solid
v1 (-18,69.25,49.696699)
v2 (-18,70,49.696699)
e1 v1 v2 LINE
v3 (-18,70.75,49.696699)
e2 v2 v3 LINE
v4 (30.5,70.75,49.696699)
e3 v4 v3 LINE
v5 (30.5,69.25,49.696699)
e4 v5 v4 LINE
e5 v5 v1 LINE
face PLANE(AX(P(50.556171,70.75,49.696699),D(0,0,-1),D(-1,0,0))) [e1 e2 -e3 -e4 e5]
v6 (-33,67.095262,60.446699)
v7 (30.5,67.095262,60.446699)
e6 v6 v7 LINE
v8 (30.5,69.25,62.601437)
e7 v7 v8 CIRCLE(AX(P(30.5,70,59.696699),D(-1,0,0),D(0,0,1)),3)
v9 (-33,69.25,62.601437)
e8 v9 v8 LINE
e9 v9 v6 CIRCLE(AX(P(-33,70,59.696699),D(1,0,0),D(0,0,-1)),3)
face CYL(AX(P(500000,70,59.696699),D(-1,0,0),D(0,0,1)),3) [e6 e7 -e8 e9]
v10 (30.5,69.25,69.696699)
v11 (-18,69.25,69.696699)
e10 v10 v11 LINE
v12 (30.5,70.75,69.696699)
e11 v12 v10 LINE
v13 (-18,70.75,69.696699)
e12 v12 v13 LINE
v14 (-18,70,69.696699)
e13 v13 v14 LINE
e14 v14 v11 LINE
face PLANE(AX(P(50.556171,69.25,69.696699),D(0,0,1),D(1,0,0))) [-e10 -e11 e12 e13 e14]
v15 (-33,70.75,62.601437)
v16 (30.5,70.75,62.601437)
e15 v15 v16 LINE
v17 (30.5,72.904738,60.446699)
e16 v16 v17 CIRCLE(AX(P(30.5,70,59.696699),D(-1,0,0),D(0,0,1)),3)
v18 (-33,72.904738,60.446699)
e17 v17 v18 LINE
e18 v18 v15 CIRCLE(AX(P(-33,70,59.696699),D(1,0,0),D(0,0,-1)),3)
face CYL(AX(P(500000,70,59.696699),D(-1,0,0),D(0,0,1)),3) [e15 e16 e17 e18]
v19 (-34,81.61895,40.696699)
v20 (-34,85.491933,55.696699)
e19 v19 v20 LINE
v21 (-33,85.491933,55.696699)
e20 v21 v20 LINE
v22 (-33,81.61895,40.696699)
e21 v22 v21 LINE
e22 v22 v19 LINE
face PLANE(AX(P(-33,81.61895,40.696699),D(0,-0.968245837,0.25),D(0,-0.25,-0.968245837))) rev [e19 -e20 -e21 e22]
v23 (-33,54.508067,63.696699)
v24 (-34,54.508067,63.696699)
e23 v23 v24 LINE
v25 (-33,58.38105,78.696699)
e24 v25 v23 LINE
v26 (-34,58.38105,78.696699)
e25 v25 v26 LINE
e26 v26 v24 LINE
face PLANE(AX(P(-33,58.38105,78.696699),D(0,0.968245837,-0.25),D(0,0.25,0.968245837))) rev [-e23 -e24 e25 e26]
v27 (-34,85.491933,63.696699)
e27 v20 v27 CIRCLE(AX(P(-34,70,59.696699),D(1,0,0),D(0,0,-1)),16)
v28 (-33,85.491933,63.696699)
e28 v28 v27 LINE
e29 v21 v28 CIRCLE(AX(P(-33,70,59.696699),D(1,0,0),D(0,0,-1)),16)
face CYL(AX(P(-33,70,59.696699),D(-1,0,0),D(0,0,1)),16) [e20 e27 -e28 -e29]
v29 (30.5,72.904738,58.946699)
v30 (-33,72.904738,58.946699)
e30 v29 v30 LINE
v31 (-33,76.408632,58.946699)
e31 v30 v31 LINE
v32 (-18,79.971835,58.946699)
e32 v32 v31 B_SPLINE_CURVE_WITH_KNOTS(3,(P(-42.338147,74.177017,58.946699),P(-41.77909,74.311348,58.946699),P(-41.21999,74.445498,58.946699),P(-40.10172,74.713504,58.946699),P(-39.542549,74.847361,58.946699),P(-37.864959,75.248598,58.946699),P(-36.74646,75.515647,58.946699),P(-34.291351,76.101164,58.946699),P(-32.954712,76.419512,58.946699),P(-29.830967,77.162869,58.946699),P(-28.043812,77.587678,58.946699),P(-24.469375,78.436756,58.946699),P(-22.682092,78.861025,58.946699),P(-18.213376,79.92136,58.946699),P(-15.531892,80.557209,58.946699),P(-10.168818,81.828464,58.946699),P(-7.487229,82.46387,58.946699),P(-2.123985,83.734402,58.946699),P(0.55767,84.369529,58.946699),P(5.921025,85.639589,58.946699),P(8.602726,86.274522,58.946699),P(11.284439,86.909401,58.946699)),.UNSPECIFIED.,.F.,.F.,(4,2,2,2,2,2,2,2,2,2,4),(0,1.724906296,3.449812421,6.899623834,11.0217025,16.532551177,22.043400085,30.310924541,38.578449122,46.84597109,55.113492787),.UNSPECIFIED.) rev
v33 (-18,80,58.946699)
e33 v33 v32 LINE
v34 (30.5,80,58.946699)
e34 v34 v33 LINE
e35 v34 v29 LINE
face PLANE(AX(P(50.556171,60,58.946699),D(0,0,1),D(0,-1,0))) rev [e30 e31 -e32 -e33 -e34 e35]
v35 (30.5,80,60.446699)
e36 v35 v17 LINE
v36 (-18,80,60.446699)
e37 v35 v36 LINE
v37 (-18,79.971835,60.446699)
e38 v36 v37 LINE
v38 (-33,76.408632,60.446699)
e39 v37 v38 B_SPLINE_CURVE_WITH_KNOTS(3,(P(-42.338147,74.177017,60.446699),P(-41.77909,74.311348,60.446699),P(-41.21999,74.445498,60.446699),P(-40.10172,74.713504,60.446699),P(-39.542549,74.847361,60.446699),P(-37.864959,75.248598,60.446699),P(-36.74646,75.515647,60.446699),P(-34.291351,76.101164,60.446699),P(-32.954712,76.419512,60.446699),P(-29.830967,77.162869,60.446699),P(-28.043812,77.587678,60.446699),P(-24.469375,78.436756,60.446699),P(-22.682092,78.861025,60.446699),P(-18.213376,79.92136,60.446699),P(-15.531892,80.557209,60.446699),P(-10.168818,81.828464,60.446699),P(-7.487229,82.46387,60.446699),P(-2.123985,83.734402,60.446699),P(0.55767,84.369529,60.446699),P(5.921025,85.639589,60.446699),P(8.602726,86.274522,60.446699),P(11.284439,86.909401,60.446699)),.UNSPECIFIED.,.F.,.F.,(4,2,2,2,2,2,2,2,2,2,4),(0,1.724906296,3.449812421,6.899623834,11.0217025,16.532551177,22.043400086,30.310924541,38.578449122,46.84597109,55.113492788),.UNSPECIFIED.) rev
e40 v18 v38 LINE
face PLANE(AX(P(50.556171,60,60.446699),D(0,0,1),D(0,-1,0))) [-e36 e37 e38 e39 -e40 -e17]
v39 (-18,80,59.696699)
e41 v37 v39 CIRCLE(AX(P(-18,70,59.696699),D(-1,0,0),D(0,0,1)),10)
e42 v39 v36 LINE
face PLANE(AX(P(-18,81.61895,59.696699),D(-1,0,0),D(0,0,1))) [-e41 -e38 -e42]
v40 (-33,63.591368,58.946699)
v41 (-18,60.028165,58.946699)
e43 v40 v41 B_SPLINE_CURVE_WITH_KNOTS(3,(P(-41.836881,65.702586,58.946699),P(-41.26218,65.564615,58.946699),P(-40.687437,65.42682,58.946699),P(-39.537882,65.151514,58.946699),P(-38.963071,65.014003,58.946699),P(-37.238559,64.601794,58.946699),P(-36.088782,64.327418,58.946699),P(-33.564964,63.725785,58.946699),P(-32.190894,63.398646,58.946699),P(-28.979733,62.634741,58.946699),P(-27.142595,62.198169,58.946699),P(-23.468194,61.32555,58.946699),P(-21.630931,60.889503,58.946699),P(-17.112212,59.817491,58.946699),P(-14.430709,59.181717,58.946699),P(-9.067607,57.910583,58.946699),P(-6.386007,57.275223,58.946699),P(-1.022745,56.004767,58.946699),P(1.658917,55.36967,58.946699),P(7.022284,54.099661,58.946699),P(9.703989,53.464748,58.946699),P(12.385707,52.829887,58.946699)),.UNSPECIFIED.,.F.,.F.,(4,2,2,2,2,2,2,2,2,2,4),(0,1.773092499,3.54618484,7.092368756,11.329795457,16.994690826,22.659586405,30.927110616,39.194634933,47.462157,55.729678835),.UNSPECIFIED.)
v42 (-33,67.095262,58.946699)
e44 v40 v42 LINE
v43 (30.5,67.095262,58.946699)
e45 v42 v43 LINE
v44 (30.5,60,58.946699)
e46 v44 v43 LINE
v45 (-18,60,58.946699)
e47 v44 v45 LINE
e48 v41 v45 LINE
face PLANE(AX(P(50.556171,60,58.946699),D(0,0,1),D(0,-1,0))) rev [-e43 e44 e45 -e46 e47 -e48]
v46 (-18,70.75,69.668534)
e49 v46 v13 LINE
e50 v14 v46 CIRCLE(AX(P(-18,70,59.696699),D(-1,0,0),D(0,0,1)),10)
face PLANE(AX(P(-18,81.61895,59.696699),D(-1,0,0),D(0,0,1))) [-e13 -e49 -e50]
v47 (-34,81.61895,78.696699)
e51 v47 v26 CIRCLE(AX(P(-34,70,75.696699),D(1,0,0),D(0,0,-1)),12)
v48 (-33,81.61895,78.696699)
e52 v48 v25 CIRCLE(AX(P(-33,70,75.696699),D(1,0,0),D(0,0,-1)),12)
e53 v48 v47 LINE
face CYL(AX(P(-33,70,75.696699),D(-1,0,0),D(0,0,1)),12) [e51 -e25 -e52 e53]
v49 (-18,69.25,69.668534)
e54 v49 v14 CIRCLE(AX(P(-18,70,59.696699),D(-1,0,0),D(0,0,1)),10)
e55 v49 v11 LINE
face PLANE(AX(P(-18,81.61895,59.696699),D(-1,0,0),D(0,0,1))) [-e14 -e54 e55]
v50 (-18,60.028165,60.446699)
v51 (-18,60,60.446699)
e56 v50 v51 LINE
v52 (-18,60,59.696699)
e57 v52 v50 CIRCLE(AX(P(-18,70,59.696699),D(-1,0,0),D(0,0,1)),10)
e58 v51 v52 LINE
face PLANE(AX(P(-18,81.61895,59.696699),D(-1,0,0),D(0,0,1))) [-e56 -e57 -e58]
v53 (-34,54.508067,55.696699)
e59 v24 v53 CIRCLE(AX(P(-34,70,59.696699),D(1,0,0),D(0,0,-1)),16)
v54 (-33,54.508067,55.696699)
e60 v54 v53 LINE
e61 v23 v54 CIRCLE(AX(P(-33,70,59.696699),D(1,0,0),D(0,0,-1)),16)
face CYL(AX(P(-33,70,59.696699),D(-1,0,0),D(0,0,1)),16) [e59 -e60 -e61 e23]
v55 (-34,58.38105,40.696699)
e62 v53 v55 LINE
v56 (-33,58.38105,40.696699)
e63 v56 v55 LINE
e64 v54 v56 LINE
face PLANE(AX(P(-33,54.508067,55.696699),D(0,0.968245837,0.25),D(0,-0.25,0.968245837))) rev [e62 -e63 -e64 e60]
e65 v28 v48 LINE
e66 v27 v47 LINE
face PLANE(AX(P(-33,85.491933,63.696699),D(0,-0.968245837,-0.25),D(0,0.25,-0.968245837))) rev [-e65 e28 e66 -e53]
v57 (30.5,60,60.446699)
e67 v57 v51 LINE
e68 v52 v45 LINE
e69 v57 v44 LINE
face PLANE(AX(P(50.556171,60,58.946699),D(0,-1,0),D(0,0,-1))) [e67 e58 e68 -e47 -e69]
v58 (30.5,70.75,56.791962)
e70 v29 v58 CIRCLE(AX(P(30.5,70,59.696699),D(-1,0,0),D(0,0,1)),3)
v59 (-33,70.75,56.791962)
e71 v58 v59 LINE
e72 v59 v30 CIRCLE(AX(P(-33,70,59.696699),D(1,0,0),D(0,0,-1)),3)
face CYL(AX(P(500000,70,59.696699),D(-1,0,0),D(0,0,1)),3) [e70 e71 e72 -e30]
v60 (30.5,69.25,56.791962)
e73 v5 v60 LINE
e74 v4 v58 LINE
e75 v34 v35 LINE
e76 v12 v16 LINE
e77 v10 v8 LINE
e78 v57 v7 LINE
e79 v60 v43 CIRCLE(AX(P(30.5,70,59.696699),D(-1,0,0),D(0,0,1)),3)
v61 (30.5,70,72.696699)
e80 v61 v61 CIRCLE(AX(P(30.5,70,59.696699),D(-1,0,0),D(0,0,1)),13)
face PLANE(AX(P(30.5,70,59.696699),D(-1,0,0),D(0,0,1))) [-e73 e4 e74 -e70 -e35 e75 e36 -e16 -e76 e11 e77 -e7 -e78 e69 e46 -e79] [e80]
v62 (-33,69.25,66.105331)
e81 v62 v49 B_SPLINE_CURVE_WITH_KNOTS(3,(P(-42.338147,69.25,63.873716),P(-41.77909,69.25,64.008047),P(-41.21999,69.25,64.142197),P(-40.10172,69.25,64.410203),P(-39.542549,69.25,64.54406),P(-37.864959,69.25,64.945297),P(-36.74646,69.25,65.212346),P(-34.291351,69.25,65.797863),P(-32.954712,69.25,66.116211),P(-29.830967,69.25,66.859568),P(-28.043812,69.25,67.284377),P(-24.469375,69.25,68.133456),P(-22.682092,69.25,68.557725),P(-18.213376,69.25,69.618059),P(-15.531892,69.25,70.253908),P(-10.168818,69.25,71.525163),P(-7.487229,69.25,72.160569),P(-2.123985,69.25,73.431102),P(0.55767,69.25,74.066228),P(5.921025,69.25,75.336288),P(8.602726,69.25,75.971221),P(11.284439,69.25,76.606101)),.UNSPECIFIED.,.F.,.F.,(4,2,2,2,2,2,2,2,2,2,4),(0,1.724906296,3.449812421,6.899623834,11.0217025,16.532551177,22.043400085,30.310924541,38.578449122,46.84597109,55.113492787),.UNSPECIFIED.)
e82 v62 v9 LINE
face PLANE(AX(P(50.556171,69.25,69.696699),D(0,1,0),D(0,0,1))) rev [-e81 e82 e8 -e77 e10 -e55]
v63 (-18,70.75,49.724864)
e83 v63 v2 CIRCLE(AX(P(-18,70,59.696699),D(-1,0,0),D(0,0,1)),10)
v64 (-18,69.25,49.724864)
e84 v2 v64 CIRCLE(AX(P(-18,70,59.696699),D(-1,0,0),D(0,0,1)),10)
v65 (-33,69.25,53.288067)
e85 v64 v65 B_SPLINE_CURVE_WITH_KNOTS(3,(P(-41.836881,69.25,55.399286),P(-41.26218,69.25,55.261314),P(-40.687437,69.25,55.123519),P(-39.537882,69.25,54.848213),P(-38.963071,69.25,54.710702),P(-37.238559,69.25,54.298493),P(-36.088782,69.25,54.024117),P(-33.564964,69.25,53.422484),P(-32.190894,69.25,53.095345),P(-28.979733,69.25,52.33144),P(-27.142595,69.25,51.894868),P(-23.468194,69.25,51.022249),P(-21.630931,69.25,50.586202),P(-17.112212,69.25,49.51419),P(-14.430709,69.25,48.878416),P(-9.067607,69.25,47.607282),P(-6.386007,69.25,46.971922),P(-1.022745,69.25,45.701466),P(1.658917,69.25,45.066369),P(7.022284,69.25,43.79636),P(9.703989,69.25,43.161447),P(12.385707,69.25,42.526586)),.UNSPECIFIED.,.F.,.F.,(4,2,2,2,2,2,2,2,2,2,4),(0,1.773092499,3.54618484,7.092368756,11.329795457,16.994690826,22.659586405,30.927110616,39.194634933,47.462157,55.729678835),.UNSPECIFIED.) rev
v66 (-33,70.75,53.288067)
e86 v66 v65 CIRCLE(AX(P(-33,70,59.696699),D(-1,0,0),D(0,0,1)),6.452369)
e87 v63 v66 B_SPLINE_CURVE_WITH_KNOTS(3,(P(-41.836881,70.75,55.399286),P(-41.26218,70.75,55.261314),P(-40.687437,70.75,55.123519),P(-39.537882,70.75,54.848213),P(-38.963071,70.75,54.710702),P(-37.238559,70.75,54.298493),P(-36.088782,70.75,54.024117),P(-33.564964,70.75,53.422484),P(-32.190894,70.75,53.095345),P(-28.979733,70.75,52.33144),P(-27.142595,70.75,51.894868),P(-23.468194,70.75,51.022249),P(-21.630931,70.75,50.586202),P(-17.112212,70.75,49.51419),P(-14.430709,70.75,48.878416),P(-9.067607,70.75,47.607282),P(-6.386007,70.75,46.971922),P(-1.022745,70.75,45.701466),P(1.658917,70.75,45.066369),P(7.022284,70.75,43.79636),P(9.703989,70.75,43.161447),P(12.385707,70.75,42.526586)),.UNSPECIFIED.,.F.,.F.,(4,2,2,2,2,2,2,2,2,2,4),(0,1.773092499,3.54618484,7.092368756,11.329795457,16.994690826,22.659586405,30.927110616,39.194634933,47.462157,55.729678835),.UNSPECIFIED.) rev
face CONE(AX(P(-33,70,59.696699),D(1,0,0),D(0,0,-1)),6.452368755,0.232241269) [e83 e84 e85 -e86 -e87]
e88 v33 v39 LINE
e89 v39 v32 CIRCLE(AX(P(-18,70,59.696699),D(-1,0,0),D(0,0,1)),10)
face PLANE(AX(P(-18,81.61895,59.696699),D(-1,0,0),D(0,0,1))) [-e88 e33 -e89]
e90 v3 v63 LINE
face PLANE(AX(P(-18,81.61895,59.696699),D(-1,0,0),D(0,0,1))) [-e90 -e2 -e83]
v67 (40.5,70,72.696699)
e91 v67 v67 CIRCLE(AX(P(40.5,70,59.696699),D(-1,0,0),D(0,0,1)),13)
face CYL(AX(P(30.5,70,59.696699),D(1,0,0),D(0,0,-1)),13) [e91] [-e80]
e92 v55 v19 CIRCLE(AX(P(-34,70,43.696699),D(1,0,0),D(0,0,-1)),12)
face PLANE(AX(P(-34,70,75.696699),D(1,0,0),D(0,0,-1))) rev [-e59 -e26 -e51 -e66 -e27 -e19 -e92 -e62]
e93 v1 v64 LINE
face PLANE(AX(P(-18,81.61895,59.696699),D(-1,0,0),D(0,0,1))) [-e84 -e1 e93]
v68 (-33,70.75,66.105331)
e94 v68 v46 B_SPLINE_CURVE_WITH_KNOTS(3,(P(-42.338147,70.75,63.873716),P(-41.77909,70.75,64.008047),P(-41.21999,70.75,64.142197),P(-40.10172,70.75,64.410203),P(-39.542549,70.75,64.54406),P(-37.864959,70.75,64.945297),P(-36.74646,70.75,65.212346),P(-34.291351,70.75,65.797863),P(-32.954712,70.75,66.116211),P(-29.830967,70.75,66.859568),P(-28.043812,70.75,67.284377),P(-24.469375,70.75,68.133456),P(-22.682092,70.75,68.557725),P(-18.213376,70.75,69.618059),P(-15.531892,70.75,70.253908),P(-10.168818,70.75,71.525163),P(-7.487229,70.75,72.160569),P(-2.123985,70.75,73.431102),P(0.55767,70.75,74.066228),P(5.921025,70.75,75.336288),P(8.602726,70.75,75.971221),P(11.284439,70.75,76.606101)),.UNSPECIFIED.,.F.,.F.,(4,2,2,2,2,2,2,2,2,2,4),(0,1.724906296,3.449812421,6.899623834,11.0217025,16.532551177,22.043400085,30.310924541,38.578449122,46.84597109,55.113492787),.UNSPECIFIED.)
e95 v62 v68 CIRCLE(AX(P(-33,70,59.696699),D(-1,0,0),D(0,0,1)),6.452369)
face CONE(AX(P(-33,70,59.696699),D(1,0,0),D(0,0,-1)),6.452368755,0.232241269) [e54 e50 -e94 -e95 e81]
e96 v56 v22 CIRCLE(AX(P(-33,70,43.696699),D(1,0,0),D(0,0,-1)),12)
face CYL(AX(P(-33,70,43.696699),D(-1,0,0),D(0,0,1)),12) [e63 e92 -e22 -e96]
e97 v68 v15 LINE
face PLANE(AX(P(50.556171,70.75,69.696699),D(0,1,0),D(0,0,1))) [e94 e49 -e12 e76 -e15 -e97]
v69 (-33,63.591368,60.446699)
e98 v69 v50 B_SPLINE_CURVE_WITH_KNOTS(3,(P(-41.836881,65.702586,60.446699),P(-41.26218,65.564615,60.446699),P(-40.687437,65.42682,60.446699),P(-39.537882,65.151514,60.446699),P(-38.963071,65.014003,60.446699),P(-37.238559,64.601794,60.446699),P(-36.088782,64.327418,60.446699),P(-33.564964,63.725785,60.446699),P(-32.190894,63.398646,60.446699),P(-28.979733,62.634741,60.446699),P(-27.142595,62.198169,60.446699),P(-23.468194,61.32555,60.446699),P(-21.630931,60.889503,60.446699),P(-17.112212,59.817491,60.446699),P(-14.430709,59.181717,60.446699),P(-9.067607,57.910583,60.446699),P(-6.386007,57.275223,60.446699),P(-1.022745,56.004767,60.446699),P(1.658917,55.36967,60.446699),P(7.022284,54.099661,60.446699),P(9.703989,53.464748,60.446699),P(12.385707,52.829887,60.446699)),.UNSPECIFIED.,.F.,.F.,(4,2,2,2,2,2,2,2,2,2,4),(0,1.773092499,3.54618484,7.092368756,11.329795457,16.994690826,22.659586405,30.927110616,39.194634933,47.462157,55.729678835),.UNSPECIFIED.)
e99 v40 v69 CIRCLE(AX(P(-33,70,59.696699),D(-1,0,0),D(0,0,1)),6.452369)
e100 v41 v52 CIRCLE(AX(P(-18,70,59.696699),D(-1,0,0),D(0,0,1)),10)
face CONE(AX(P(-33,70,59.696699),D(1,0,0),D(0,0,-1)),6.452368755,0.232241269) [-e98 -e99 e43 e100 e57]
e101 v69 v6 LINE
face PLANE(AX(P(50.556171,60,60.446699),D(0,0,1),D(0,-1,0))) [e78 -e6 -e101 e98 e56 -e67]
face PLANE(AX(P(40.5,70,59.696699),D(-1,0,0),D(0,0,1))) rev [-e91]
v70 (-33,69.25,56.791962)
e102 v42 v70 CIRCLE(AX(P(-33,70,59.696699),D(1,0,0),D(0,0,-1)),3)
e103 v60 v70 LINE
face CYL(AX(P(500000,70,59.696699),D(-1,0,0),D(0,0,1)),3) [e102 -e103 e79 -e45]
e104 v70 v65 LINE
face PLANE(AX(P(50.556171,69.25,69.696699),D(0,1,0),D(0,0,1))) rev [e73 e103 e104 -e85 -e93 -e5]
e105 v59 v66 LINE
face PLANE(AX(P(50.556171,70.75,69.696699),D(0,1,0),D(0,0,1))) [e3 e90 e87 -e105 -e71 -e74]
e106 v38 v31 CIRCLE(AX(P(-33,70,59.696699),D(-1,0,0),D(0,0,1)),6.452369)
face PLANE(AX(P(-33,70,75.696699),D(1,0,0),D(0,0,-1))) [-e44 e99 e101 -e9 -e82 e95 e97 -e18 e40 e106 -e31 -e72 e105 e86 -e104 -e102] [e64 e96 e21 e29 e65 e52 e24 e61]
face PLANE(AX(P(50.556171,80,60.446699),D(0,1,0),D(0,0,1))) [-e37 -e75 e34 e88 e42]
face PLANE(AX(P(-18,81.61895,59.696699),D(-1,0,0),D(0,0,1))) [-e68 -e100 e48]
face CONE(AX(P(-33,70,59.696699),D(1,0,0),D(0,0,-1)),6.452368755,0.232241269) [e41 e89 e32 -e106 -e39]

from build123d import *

# Parameters (mm, degrees)
BOSS_EXTRUDE1_DEPTH      = 90
FILLET1_R                = 7.5
FILLET2_R                = 2
SKETCH2_W                = 20
SKETCH2_H                = 80
SKETCH2_W_2              = 32
BOSS_EXTRUDE2_DEPTH      = 20
SKETCH3_R                = 2.5
BOSS_EXTRUDE3_DEPTH      = 111
BOSS_EXTRUDE4_START      = 7.5
SKETCH4_W                = 80
SKETCH4_H                = 20
SKETCH4_R                = 3.25
BOSS_EXTRUDE4_DEPTH      = 20
MOVE_FACE1_BY            = 1.5
MOVE_FACE2_BY            = 1.5
FILLET3_R                = 4
FILLET4_R                = 4
CUT_EXTRUDE1_DEPTH       = 2
BOSS_EXTRUDE5_DEPTH      = 2
SKETCH7_W                = 58
SKETCH7_H                = 15
CUT_EXTRUDE2_DEPTH       = 0.5
SKETCH8_R                = 10
BOSS_EXTRUDE6_DEPTH      = 1.5
SKETCH10_R               = 4.25
SKETCH10_R_2             = 2.75
CUT_EXTRUDE_THIN1_DEPTH  = 1.5
SKETCH11_RX              = 5
SKETCH11_RY              = 2.5
BOSS_EXTRUDE7_DEPTH      = 1.5
LPATTERN1_COUNT          = 3
LPATTERN1_PITCH          = 24
SKETCH12_RX              = 5
SKETCH12_RY              = 2.5
BOSS_EXTRUDE8_DEPTH      = 1.5
LPATTERN2_START          = 113.13708499
LPATTERN2_DEPTH          = 1.5
FILLET7_R                = 7.5
FILLET5_R                = 5
FILLET6_R                = 2
SHELL1_T                 = -1
SKETCH14_R               = 14
BOSS_EXTRUDE9_DEPTH      = 1
BOSS_EXTRUDE10_DEPTH     = 1
BOSS_EXTRUDE11_START     = -30
BOSS_EXTRUDE11_OUTLINE_R = 13
BOSS_EXTRUDE11_DEPTH     = 10
BOSS_EXTRUDE12_REACH     = 233.484
SKETCH18_R               = 3
SKETCH17_W               = 1.5
SKETCH17_H               = 20
SKETCH17_W_2             = 20
SKETCH17_H_2             = 1.5
EXTRUDE_THIN1_DEPTH      = 63.5
SKETCH20_R               = 12.5
BOSS_EXTRUDE13_DEPTH     = 5
FILLET8_R                = 2


# Read off the part's stored shape, not the designer's step: LPattern2, Body-Move/Copy1, Boss-Extrude11
with BuildPart() as part:
    # Sketch1 → Boss-Extrude1 (new, symmetric)
    with BuildSketch(Plane(origin=(0, 0, 0), x_dir=(0, 0, -1), z_dir=(1, 0, 0))):
        Polygon((0, 0), (0, 45), (-115, 45), (-160, 0), align=None)
    extrude(amount=BOSS_EXTRUDE1_DEPTH, both=True)

    # Fillet1
    fillet1_edges = [part.edges().sort_by_distance(p)[0] for p in [
        (0, 0, 160),
        (0, 45, 115),
        (0, 45, 0),
        (0, 0, 0),
    ]]
    fillet(fillet1_edges, radius=FILLET1_R)

    # Fillet2
    fillet2_edges = [part.edges().sort_by_distance(p)[0] for p in [
        (-90, 0, 74.696699141),
        (90, 0, 74.696699141),
        (-90, 27.803300859, 132.196699141),
        (-90, 45, 59.696699141),
        (-90, 22.5, 0),
        (-90, 44.429096494, 114.763524025),
        (-90, 2.196699141, 2.196699141),
        (-90, 42.803300859, 2.196699141),
        (-90, 4.629874257, 148.822494776),
        (90, 27.803300859, 132.196699141),
        (90, 22.5, 0),
        (90, 45, 59.696699141),
        (90, 44.429096494, 114.763524025),
        (90, 2.196699141, 2.196699141),
        (90, 42.803300859, 2.196699141),
        (90, 4.629874257, 148.822494776),
    ]]
    fillet(fillet2_edges, radius=FILLET2_R)

    # Sketch2 → Boss-Extrude2 (add)
    with BuildSketch(Plane(origin=(0, 45, 0), x_dir=(1, 0, 0), z_dir=(0, 1, 0))):
        with Locations((-71.5, -59.696699141)):
            Rectangle(SKETCH2_W, SKETCH2_H)
        with Locations((65.5, -59.696699141)):
            Rectangle(SKETCH2_W_2, SKETCH2_H)
    extrude(amount=BOSS_EXTRUDE2_DEPTH)

    # Sketch3 → Boss-Extrude3 (add)
    with BuildSketch(Plane(origin=(-61.5, 0, 0), x_dir=(0, 0, -1), z_dir=(1, 0, 0))):
        with Locations(Location((-89.696699141, 59.5, 0), (0, 0, 180))):
            Circle(SKETCH3_R)
        with Locations(Location((-89.696699141, 50.5, 0), (0, 0, 180))):
            Circle(SKETCH3_R)
        with Locations(Location((-29.696699141, 50.5, 0), (0, 0, 180))):
            Circle(SKETCH3_R)
        with Locations(Location((-29.696699141, 59.5, 0), (0, 0, 180))):
            Circle(SKETCH3_R)
    extrude(amount=BOSS_EXTRUDE3_DEPTH)

    # Fillet3
    fillet3_edges = [part.edges().sort_by_distance(p)[0] for p in [
        (65.5, 65, 99.696699141),
        (65.5, 65, 19.696699141),
        (-71.5, 65, 99.696699141),
        (-71.5, 65, 19.696699141),
    ]]
    fillet(fillet3_edges, radius=FILLET3_R)

    # Sketch5 → Cut-Extrude1 (cut)
    with BuildSketch(Plane(origin=(0, 80, 80), x_dir=(1, 0, 0), z_dir=(0, 0.7071067811865511, 0.707106781186544))):
        with BuildLine():
            Line((-65, -56.317279836), (65, -56.317279836))
            ThreePointArc((65, -56.317279836), (66.767766953, -57.049512883), (67.5, -58.817279836))
            Line((67.5, -58.817279836), (67.5, -88.817279836))
            ThreePointArc((67.5, -88.817279836), (66.767766953, -90.585046789), (65, -91.317279836))
            Line((65, -91.317279836), (-65, -91.317279836))
            ThreePointArc((-65, -91.317279836), (-66.767766953, -90.585046789), (-67.5, -88.817279836))
            Line((-67.5, -88.817279836), (-67.5, -58.817279836))
            ThreePointArc((-67.5, -58.817279836), (-66.767766953, -57.049512883), (-65, -56.317279836))
        make_face()
    extrude(amount=-CUT_EXTRUDE1_DEPTH, mode=Mode.SUBTRACT)


with BuildPart() as body_2:
    # Sketch4 → Boss-Extrude4 (new body)
    with BuildSketch(Plane(origin=(-61.5, 0, 0), x_dir=(0, 0, -1), z_dir=(1, 0, 0)).offset(BOSS_EXTRUDE4_START)):
        with Locations((-59.696699141, 55)):
            Rectangle(SKETCH4_W, SKETCH4_H)
        with Locations((-89.696699141, 59.5)):
            Circle(SKETCH4_R, mode=Mode.SUBTRACT)
        with Locations((-89.696699141, 50.5)):
            Circle(SKETCH4_R, mode=Mode.SUBTRACT)
        with Locations((-29.696699141, 59.5)):
            Circle(SKETCH4_R, mode=Mode.SUBTRACT)
        with Locations((-29.696699141, 50.5)):
            Circle(SKETCH4_R, mode=Mode.SUBTRACT)
    extrude(amount=BOSS_EXTRUDE4_DEPTH)

    # Move Face1: a face moved outward by 1.5
    extrude(body_2.faces().sort_by_distance((-44, 65, 59.696699141))[0], amount=MOVE_FACE1_BY, dir=(0, 1, 0))

    # Move Face2: a face moved inward by 1.5
    extrude(body_2.faces().sort_by_distance((-44, 45, 59.696699141))[0], amount=MOVE_FACE2_BY, dir=(0, 1, 0), mode=Mode.SUBTRACT)

    # Fillet4
    fillet4_edges = [body_2.edges().sort_by_distance(p)[0] for p in [
        (-44, 66.5, 99.696699141),
        (-44, 66.5, 19.696699141),
        (-44, 46.5, 19.696699141),
        (-44, 46.5, 99.696699141),
    ]]
    fillet(fillet4_edges, radius=FILLET4_R)


with BuildPart() as body_3:
    # Sketch6 → Boss-Extrude5 (new body)
    with BuildSketch(Plane(origin=(0, 78.585786438, 78.585786438), x_dir=(1, 0, 0), z_dir=(0, 0.7071067811865509, 0.7071067811865441))):
        with BuildLine():
            Line((65, -56.317279836), (-65, -56.317279836))
            ThreePointArc((-65, -56.317279836), (-66.767766953, -57.049512883), (-67.5, -58.817279836))
            Line((-67.5, -58.817279836), (-67.5, -88.817279836))
            ThreePointArc((-67.5, -88.817279836), (-66.767766953, -90.585046789), (-65, -91.317279836))
            Line((-65, -91.317279836), (65, -91.317279836))
            ThreePointArc((65, -91.317279836), (66.767766953, -90.585046789), (67.5, -88.817279836))
            Line((67.5, -88.817279836), (67.5, -58.817279836))
            ThreePointArc((67.5, -58.817279836), (66.767766953, -57.049512883), (65, -56.317279836))
        make_face()
    extrude(amount=BOSS_EXTRUDE5_DEPTH)

    # Sketch7 → Cut-Extrude2 (cut)
    with BuildSketch(Plane(origin=(0, 80, 80), x_dir=(1, 0, 0), z_dir=(0, 0.7071067811865509, 0.7071067811865441))):
        with Locations((-28.5, -71.817279836)):
            Rectangle(SKETCH7_W, SKETCH7_H)
    extrude(amount=-CUT_EXTRUDE2_DEPTH, mode=Mode.SUBTRACT)

    # Sketch8 → Boss-Extrude6 (add)
    with BuildSketch(Plane(origin=(0, 80, 80), x_dir=(1, 0, 0), z_dir=(0, 0.7071067811865509, 0.7071067811865441))):
        with Locations(Location((15.5, -71.817279836, 0), (0, 0, 270))):
            Circle(SKETCH8_R)
    extrude(amount=BOSS_EXTRUDE6_DEPTH)

    # Sketch10 → Cut-Extrude-Thin1 (cut)
    # profile 1 of 5: a face of its own
    with BuildSketch(Plane(origin=(0, 81.060660172, 81.060660172), x_dir=(1, 0, 0), z_dir=(0, 0.7071067811865509, 0.7071067811865441))):
        with Locations((15.5, -71.817279836)):
            Circle(SKETCH10_R)
        with Locations((15.5, -71.817279836)):
            Circle(SKETCH10_R_2, mode=Mode.SUBTRACT)
    # profile 2 of 5: a face of its own
    with BuildSketch(Plane(origin=(0, 81.060660172, 81.060660172), x_dir=(1, 0, 0), z_dir=(0, 0.7071067811865509, 0.7071067811865441))):
        Polygon((7.898602102, -65.27654211), (12.49479618, -69.872736188), (13.555456352, -68.812076016), (8.959262274, -64.215881939), align=None)
    # profile 3 of 5: a face of its own
    with BuildSketch(Plane(origin=(0, 81.060660172, 81.060660172), x_dir=(1, 0, 0), z_dir=(0, 0.7071067811865509, 0.7071067811865441))):
        Polygon((22.040737726, -64.215881939), (17.444543648, -68.812076016), (18.50520382, -69.872736188), (23.101397898, -65.27654211), align=None)
    # profile 4 of 5: a face of its own
    with BuildSketch(Plane(origin=(0, 81.060660172, 81.060660172), x_dir=(1, 0, 0), z_dir=(0, 0.7071067811865509, 0.7071067811865441))):
        Polygon((17.444543648, -74.822483656), (22.040737726, -79.418677734), (23.101397898, -78.358017562), (18.50520382, -73.761823485), align=None)
    # profile 5 of 5: a face of its own
    with BuildSketch(Plane(origin=(0, 81.060660172, 81.060660172), x_dir=(1, 0, 0), z_dir=(0, 0.7071067811865509, 0.7071067811865441))):
        Polygon((12.49479618, -73.761823485), (7.898602102, -78.358017562), (8.959262274, -79.418677734), (13.555456352, -74.822483656), align=None)
    extrude(amount=-CUT_EXTRUDE_THIN1_DEPTH, mode=Mode.SUBTRACT)

    # Sketch11 → Boss-Extrude7 (add)
    with BuildSketch(Plane(origin=(0, 80, 80), x_dir=(1, 0, 0), z_dir=(0, 0.7071067811865509, 0.7071067811865441))):
        with Locations((-52.5, -85.317279836)):
            Ellipse(SKETCH11_RX, SKETCH11_RY)
    boss_extrude7 = extrude(amount=BOSS_EXTRUDE7_DEPTH)

    # LPattern1: Boss-Extrude7 ×3
    with Locations(*[(i * LPATTERN1_PITCH, 0, 0) for i in range(1, LPATTERN1_COUNT)]):
        add(boss_extrude7)

    # Sketch12 → Boss-Extrude8 (add)
    with BuildSketch(Plane(origin=(0, 80, 80), x_dir=(1, 0, 0), z_dir=(0, 0.7071067811865509, 0.7071067811865441))):
        with Locations((32.5, -66.317279836)):
            Ellipse(SKETCH12_RX, SKETCH12_RY)
    extrude(amount=BOSS_EXTRUDE8_DEPTH)

    # LPattern2 outline → LPattern2 (add)
    with BuildSketch(Plane(origin=(0, 0, 0), x_dir=(1, 0, 0), z_dir=(0, 0.707106781186551, 0.7071067811865439)).offset(LPATTERN2_START)):
        with BuildLine():
            add(Edge.make_bspline(
                [(37.5, -74.317279836), (37.5, -69.987152818), (30, -72.152216327), (22.5, -74.317279836), (30, -76.482343346), (37.5, -78.647406855), (37.5, -74.317279836)],
                knots=[0, 0, 0, 2.094395102, 2.094395102, 4.188790205, 4.188790205, 6.283185307, 6.283185307, 6.283185307], degree=2, weights=[1, 0.5, 1, 0.5, 1, 0.5, 1]))
        make_face()
        with BuildLine():
            add(Edge.make_bspline(
                [(37.5, -82.317279836), (37.5, -77.987152818), (30, -80.152216327), (22.5, -82.317279836), (30, -84.482343346), (37.5, -86.647406855), (37.5, -82.317279836)],
                knots=[0, 0, 0, 2.094395102, 2.094395102, 4.188790205, 4.188790205, 6.283185307, 6.283185307, 6.283185307], degree=2, weights=[1, 0.5, 1, 0.5, 1, 0.5, 1]))
        make_face()
        with BuildLine():
            add(Edge.make_bspline(
                [(49.5, -66.317279836), (49.5, -61.987152818), (42, -64.152216327), (34.5, -66.317279836), (42, -68.482343346), (49.5, -70.647406855), (49.5, -66.317279836)],
                knots=[0, 0, 0, 2.094395102, 2.094395102, 4.188790205, 4.188790205, 6.283185307, 6.283185307, 6.283185307], degree=2, weights=[1, 0.5, 1, 0.5, 1, 0.5, 1]))
        make_face()
        with BuildLine():
            add(Edge.make_bspline(
                [(49.5, -74.317279836), (49.5, -69.987152818), (42, -72.152216327), (34.5, -74.317279836), (42, -76.482343346), (49.5, -78.647406855), (49.5, -74.317279836)],
                knots=[0, 0, 0, 2.094395102, 2.094395102, 4.188790205, 4.188790205, 6.283185307, 6.283185307, 6.283185307], degree=2, weights=[1, 0.5, 1, 0.5, 1, 0.5, 1]))
        make_face()
        with BuildLine():
            add(Edge.make_bspline(
                [(49.5, -82.317279836), (49.5, -77.987152818), (42, -80.152216327), (34.5, -82.317279836), (42, -84.482343346), (49.5, -86.647406855), (49.5, -82.317279836)],
                knots=[0, 0, 0, 2.094395102, 2.094395102, 4.188790205, 4.188790205, 6.283185307, 6.283185307, 6.283185307], degree=2, weights=[1, 0.5, 1, 0.5, 1, 0.5, 1]))
        make_face()
        with BuildLine():
            add(Edge.make_bspline(
                [(61.5, -66.317279836), (61.5, -61.987152818), (54, -64.152216327), (46.5, -66.317279836), (54, -68.482343346), (61.5, -70.647406855), (61.5, -66.317279836)],
                knots=[0, 0, 0, 2.094395102, 2.094395102, 4.188790205, 4.188790205, 6.283185307, 6.283185307, 6.283185307], degree=2, weights=[1, 0.5, 1, 0.5, 1, 0.5, 1]))
        make_face()
        with BuildLine():
            add(Edge.make_bspline(
                [(61.5, -74.317279836), (61.5, -69.987152818), (54, -72.152216327), (46.5, -74.317279836), (54, -76.482343346), (61.5, -78.647406855), (61.5, -74.317279836)],
                knots=[0, 0, 0, 2.094395102, 2.094395102, 4.188790205, 4.188790205, 6.283185307, 6.283185307, 6.283185307], degree=2, weights=[1, 0.5, 1, 0.5, 1, 0.5, 1]))
        make_face()
        with BuildLine():
            add(Edge.make_bspline(
                [(61.5, -82.317279836), (61.5, -77.987152818), (54, -80.152216327), (46.5, -82.317279836), (54, -84.482343346), (61.5, -86.647406855), (61.5, -82.317279836)],
                knots=[0, 0, 0, 2.094395102, 2.094395102, 4.188790205, 4.188790205, 6.283185307, 6.283185307, 6.283185307], degree=2, weights=[1, 0.5, 1, 0.5, 1, 0.5, 1]))
        make_face()
    extrude(amount=LPATTERN2_DEPTH)


with BuildPart() as body_4:
    # Sketch13 → Revolve1 (revolve)
    with BuildSketch(Plane.XY.offset(59.696699141), mode=Mode.PRIVATE) as revolve1_sk:
        Polygon((11.5, 70), (11.5, 85), (105.301145933, 85), (111.5, 74.263269807), (121.5, 72.5), (121.5, 70), align=None)
    revolve(revolve1_sk.sketch.rotate(Axis((11.5, 70, 59.696699141), (1, 0, 0)), 90), axis=Axis((11.5, 70, 59.696699141), (1, 0, 0)))

    # Fillet5
    fillet5_edges = [body_4.edges().sort_by_distance(p)[0] for p in [
        (105.301145933, 70, 44.696699141),
    ]]
    fillet(fillet5_edges, radius=FILLET5_R)

    # Fillet6
    fillet6_edges = [body_4.edges().sort_by_distance(p)[0] for p in [
        (111.5, 70, 55.433429334),
    ]]
    fillet(fillet6_edges, radius=FILLET6_R)

    # Shell1
    shell1_openings = [body_4.faces().sort_by_distance(p)[0] for p in [
        (121.5, 70, 59.696699141),
        (11.5, 70, 59.696699141),
    ]]
    offset(amount=SHELL1_T, openings=shell1_openings, kind=Kind.INTERSECTION)

    # Sketch14 → Boss-Extrude9 (add)
    with BuildSketch(Plane.ZY.offset(-11.5)):
        with BuildLine():
            Line((55.696699141, 85.491933385), (40.696699141, 81.618950039))
            ThreePointArc((40.696699141, 81.618950039), (31.696699141, 70), (40.696699141, 58.381049961))
            Line((40.696699141, 58.381049961), (55.696699141, 54.508066615))
            ThreePointArc((55.696699141, 54.508066615), (59.696699141, 54), (63.696699141, 54.508066615))
            Line((63.696699141, 54.508066615), (78.696699141, 58.381049961))
            ThreePointArc((78.696699141, 58.381049961), (87.696699141, 70), (78.696699141, 81.618950039))
            Line((78.696699141, 81.618950039), (63.696699141, 85.491933385))
            ThreePointArc((63.696699141, 85.491933385), (59.696699141, 86), (55.696699141, 85.491933385))
        make_face()
        with Locations((59.696699141, 70)):
            Circle(SKETCH14_R, mode=Mode.SUBTRACT)
    extrude(amount=BOSS_EXTRUDE9_DEPTH)


with BuildPart() as body_5:
    # Body-Move/Copy1 outline → Body-Move/Copy1 (revolve)
    with BuildSketch(Plane(origin=(0, 70, 59.696699141), x_dir=(0, 1, 0), z_dir=(0, 0, -1))):
        Polygon((0, 121.5), (0, 11.5), (15, 11.5), (15, 105.301145933), (4.263269807, 111.5), (2.5, 121.5), align=None)
    revolve(axis=Axis((0, 70, 59.696699141), (1, 0, 0)))


with BuildPart() as part_1:
    add(part.part)

    # Combine1: cut body 5
    add(body_5.part, mode=Mode.SUBTRACT)

    # Fillet7
    fillet7_edges = [part_1.edges().sort_by_distance(p)[0] for p in [
        (65.5, 65, 73.838834765),
        (65.5, 65, 45.554563517),
    ]]
    fillet(fillet7_edges, radius=FILLET7_R)

    # Sketch20 → Boss-Extrude13 (add)
    with BuildSketch(Plane.XZ):
        with Locations(Location((-60, 116.893398282, 0), (0, 0, 90))):
            Circle(SKETCH20_R)
        with Locations(Location((-60, 32.5, 0), (0, 0, 90))):
            Circle(SKETCH20_R)
        with Locations(Location((60, 32.5, 0), (0, 0, 90))):
            Circle(SKETCH20_R)
        with Locations(Location((60, 116.893398282, 0), (0, 0, 90))):
            Circle(SKETCH20_R)
    extrude(amount=BOSS_EXTRUDE13_DEPTH)

    # Fillet8
    fillet8_edges = [part_1.edges().sort_by_distance(p)[0] for p in [
        (-60, -5, 104.393398282),
        (-60, -5, 20),
        (60, -5, 20),
        (60, -5, 104.393398282),
    ]]
    fillet(fillet8_edges, radius=FILLET8_R)


with BuildPart() as body_5_2:
    # Sketch15 → Boss-Extrude10 (new body)
    with BuildSketch(Plane(origin=(-34, 0, 0), x_dir=(0, 0, -1), z_dir=(1, 0, 0))):
        with BuildLine():
            Line((-63.696699141, 85.491933385), (-78.696699141, 81.618950039))
            ThreePointArc((-78.696699141, 81.618950039), (-87.696699141, 70), (-78.696699141, 58.381049961))
            Line((-78.696699141, 58.381049961), (-63.696699141, 54.508066615))
            ThreePointArc((-63.696699141, 54.508066615), (-59.696699141, 54), (-55.696699141, 54.508066615))
            Line((-55.696699141, 54.508066615), (-40.696699141, 58.381049961))
            ThreePointArc((-40.696699141, 58.381049961), (-31.696699141, 70), (-40.696699141, 81.618950039))
            Line((-40.696699141, 81.618950039), (-55.696699141, 85.491933385))
            ThreePointArc((-55.696699141, 85.491933385), (-59.696699141, 86), (-63.696699141, 85.491933385))
        make_face()
    extrude(amount=BOSS_EXTRUDE10_DEPTH)


with BuildPart() as body_6:
    # Boss-Extrude11 outline → Boss-Extrude11 (new body)
    with BuildSketch(Plane.ZY.offset(-10.5).offset(BOSS_EXTRUDE11_START)):
        with Locations((59.696699141, 70)):
            Circle(BOSS_EXTRUDE11_OUTLINE_R)
    extrude(amount=BOSS_EXTRUDE11_DEPTH)

    # Sketch18 → Boss-Extrude12 (add, up to next)
    with BuildSketch(Plane(origin=(-33, 0, 0), x_dir=(0, 0, -1), z_dir=(1, 0, 0)), mode=Mode.PRIVATE) as boss_extrude12_sk1:
        with Locations(Location((-59.696699141, 70, 0), (0, 0, 180))):
            Circle(SKETCH18_R)
    boss_extrude12_tool1 = extrude(boss_extrude12_sk1.sketch, amount=BOSS_EXTRUDE12_REACH, mode=Mode.PRIVATE) - body_6.part

    add(body_5_2.part)  # Boss-Extrude12 merges body 5 2
    add(boss_extrude12_tool1.solids().sort_by_distance((-33, 70, 59.696699))[0])

    # Sketch17 → Extrude-Thin1 (add)
    with BuildSketch(Plane(origin=(-33, 0, 0), x_dir=(0, 0, -1), z_dir=(1, 0, 0))):
        with Locations((-59.696699141, 70)):
            Rectangle(SKETCH17_W, SKETCH17_H)
        with Locations((-59.696699141, 70)):
            Rectangle(SKETCH17_W_2, SKETCH17_H_2)
    extrude(amount=EXTRUDE_THIN1_DEPTH)

    # Sketch19 → Cut-Revolve3 (revolve, cut)
    with BuildSketch(Plane.XY.offset(59.696699141), mode=Mode.PRIVATE) as cut_revolve3_sk:
        Polygon((-33, 76.452368755), (-18, 80), (-18, 81.618950039), (-33, 81.618950039), align=None)
    revolve(cut_revolve3_sk.sketch.rotate(Axis((111.5, 70, 59.696699141), (-1, 0, 0)), 270), axis=Axis((111.5, 70, 59.696699141), (-1, 0, 0)), mode=Mode.SUBTRACT)


solid = body_6.part
